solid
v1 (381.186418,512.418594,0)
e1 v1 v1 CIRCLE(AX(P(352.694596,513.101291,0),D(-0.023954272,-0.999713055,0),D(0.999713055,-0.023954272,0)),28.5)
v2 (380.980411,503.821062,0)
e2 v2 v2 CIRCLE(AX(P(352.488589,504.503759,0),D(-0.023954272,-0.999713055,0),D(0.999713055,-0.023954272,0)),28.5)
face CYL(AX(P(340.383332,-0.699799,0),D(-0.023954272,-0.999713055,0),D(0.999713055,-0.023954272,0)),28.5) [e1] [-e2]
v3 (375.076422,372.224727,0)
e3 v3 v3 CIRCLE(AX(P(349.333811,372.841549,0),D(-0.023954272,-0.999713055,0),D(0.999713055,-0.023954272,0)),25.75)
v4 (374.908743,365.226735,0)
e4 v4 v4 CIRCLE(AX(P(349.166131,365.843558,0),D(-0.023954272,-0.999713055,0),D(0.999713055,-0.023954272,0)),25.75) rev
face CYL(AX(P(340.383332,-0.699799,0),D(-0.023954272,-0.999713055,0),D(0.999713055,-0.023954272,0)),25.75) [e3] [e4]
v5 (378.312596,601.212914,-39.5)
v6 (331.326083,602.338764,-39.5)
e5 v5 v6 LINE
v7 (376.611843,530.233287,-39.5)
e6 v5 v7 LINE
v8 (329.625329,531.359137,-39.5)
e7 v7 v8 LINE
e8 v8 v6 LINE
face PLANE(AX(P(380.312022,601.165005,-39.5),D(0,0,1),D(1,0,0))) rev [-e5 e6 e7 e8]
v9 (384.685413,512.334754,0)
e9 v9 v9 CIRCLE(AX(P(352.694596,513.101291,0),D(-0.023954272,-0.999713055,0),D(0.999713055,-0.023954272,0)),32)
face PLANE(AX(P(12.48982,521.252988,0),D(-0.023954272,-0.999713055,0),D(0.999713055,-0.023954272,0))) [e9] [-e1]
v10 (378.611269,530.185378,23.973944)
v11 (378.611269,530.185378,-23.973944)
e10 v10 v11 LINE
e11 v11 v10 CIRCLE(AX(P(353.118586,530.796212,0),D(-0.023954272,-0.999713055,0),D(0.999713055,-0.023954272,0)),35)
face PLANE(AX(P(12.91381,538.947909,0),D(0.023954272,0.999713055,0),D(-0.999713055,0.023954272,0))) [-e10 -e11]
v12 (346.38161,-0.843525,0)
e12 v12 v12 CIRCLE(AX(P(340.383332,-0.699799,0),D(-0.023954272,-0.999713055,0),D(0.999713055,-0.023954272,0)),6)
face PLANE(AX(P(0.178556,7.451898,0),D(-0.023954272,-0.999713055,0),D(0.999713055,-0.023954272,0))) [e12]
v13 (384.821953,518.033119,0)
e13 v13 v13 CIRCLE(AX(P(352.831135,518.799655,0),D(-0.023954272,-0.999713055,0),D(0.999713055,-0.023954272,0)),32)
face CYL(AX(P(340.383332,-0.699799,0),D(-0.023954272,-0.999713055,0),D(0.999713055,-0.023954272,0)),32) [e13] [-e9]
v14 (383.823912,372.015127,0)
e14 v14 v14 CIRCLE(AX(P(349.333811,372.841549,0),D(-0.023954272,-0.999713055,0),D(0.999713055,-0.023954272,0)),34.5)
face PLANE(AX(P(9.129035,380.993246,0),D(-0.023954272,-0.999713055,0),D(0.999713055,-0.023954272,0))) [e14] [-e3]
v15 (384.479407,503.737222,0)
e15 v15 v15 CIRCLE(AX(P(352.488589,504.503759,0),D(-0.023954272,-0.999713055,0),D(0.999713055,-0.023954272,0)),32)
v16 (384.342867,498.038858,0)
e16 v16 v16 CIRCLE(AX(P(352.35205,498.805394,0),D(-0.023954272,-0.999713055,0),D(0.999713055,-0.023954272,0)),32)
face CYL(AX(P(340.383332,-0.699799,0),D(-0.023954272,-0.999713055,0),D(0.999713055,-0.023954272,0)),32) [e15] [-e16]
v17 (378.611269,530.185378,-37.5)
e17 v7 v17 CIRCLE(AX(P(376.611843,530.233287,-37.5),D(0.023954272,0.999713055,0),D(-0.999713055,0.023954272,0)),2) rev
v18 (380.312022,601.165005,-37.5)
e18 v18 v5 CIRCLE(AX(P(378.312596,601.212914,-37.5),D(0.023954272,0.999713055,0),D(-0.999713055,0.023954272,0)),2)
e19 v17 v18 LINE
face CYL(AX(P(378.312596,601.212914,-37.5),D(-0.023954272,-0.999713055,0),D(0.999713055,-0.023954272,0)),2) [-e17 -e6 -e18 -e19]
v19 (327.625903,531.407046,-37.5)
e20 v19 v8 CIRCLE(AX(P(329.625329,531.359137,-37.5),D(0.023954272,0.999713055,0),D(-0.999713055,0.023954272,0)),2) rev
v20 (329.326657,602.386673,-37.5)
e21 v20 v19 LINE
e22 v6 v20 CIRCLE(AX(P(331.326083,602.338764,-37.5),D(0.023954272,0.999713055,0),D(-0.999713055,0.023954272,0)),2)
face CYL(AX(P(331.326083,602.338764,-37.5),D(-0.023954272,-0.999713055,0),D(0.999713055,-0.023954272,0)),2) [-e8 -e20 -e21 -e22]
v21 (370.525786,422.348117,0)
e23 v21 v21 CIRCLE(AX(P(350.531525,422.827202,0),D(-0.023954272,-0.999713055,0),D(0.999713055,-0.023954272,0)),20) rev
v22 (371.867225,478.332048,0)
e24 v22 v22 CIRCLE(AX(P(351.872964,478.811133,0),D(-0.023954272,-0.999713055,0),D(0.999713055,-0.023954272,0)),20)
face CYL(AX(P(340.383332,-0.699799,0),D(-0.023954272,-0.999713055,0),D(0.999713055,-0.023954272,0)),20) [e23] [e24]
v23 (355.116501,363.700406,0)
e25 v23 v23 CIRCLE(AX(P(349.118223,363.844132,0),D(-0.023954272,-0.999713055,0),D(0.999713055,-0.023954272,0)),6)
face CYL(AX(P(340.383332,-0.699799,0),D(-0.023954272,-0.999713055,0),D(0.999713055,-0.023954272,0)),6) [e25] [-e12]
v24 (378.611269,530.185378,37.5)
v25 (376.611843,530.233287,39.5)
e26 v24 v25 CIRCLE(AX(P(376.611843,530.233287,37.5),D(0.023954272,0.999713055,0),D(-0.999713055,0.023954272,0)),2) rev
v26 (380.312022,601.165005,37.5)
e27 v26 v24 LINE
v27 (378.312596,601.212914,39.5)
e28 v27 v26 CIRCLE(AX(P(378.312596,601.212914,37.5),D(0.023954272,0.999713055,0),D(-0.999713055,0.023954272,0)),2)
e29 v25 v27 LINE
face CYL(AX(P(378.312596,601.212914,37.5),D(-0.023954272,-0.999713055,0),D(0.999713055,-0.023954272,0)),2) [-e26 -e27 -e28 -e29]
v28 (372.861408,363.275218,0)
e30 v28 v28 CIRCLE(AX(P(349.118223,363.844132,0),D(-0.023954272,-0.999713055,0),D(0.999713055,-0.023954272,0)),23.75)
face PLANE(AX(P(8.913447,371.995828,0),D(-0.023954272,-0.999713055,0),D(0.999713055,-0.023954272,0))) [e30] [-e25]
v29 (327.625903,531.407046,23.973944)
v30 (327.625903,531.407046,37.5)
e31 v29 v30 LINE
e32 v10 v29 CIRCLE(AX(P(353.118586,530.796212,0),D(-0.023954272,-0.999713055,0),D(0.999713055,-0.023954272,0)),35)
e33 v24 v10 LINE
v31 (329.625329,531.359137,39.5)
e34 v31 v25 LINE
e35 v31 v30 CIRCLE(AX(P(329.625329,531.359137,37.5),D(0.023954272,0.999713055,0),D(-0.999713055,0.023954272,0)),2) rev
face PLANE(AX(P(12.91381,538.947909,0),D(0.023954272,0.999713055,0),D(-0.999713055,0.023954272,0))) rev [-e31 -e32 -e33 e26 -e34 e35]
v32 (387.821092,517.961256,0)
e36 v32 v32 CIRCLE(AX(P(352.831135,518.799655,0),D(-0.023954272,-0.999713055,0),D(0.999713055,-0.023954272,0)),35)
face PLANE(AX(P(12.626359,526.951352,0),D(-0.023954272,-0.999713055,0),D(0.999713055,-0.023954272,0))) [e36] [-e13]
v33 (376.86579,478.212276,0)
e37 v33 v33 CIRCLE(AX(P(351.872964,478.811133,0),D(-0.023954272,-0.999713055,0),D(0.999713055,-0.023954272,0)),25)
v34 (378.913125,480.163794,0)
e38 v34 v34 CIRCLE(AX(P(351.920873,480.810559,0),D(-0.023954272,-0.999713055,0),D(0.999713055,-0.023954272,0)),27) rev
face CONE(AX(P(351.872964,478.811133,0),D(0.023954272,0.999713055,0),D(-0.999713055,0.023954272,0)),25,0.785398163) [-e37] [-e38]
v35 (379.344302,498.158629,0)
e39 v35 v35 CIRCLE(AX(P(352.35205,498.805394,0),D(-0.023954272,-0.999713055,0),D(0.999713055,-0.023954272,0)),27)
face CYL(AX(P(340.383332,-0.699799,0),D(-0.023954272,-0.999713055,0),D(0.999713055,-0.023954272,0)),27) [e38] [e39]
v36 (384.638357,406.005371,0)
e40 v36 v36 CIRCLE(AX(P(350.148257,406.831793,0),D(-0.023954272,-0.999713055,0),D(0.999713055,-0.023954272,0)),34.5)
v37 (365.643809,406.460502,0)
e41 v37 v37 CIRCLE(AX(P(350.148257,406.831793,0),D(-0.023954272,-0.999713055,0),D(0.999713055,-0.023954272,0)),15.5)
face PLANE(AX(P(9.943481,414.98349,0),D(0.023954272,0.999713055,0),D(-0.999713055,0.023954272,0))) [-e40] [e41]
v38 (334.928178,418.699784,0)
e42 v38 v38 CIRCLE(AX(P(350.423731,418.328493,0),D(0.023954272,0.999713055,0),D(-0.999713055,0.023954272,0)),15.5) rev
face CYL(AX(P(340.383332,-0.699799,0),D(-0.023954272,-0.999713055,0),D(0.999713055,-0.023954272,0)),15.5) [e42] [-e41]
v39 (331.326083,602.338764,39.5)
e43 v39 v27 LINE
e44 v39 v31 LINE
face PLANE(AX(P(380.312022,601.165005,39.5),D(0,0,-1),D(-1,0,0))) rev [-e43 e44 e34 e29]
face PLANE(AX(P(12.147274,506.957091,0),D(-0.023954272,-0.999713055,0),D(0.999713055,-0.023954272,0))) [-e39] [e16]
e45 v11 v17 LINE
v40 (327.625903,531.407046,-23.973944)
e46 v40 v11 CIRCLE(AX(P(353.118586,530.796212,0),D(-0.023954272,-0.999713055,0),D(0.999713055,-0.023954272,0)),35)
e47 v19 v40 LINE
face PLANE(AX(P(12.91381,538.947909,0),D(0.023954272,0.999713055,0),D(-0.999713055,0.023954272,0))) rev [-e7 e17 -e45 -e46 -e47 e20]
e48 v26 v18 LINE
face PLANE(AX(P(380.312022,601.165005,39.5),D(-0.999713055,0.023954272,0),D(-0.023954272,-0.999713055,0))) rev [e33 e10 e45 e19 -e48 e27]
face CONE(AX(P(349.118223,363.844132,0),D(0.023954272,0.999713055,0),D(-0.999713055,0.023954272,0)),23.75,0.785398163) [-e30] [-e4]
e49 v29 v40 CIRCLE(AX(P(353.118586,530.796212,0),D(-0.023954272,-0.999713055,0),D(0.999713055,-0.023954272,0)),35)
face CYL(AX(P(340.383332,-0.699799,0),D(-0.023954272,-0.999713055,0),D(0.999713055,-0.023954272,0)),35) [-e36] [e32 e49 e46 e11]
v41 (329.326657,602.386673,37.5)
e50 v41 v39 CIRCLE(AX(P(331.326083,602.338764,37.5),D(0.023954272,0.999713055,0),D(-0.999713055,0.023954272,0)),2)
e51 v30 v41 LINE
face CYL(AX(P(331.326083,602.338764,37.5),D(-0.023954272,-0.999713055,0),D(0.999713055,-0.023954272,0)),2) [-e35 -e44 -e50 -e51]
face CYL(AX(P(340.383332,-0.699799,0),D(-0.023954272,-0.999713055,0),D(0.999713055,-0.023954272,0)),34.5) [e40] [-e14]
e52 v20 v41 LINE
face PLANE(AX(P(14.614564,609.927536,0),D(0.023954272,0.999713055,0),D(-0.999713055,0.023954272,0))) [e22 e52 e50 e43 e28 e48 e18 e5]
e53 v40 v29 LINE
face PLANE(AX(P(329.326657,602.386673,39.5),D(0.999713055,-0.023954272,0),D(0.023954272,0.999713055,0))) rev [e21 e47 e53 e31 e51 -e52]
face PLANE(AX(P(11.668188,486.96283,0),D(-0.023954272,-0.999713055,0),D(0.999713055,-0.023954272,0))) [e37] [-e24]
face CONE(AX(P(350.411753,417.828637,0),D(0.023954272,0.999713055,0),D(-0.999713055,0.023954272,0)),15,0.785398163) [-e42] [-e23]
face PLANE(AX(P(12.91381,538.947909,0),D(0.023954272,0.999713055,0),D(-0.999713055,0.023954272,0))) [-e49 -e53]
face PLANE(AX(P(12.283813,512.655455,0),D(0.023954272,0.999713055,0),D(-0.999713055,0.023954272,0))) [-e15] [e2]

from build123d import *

# Parameters (mm, degrees)
CHAMFER1_SIZE       = 5
CHAMFER2_SIZE       = 2
SKETCH2_W           = 51
SKETCH2_H           = 79
BOSS_EXTRUDE1_DEPTH = 71
FILLET1_R           = 2


with BuildPart() as part:
    # Sketch1 → Revolve2 (revolve)
    with BuildSketch(Plane.XY):
        Polygon((387.82109188, 517.961255794), (388.108543141, 529.957812458), (353.118586206, 530.796211969), (340.38333201, -0.699799139), (346.381610341, -0.843524769), (355.116501156, 363.700406109), (374.860833998, 363.227309242), (375.076422443, 372.22472674), (383.823911677, 372.015126862), (384.638356916, 406.005370741), (365.643808866, 406.460501904), (365.907305855, 417.457345512), (370.406014604, 417.349551289), (371.867225181, 478.33204766), (378.865216568, 478.164367758), (379.344302003, 498.158628863), (384.342867279, 498.038857504), (384.479406628, 503.737221919), (380.980410934, 503.82106187), (381.186417671, 512.418594146), (384.685413365, 512.334754195), (384.821952714, 518.03311861), align=None)
    revolve(axis=Axis((340.38333201, -0.699799139, 0), (0.023954271746676543, 0.9997130552639024, 0)))

    # Chamfer1
    # the kernel refuses this chamfer: 5 mm, written as the material it takes off along each edge
    with BuildSketch(Plane(origin=(350.411753499, 417.828636724, 0), x_dir=(0.9997130552639024, -0.02395427174667721, 0), z_dir=(0, 0, 1))) as chamfer1_piece_1_section:
        Polygon((20 - CHAMFER1_SIZE, 0), (20, CHAMFER1_SIZE), (20, 0), align=None)
    chamfer1_piece_1 = revolve(axis=Axis((350.411753499, 417.828636724, 0), (0.023954271746676543, 0.9997130552639024, 0)), mode=Mode.PRIVATE)
    chamfer1_piece_1 = chamfer1_piece_1 - Plane(origin=(350.477356387, 420.56652265, 0), x_dir=(0.9997130552639024, -0.023954271746676543, 0), z_dir=(0.023954271746676543, 0.9997130552639024, 0)) * Cylinder(15.5, 80, mode=Mode.PRIVATE)
    add(chamfer1_piece_1, mode=Mode.SUBTRACT)

    # Chamfer2
    chamfer2_edges = [part.edges().sort_by_distance(p)[0] for p in [
        (324.880711583, 479.457898432, 0),
        (323.375611652, 364.460954237, 0),
    ]]
    chamfer(chamfer2_edges, length=CHAMFER2_SIZE)

    # Sketch2 → Boss-Extrude1 (add)
    with BuildSketch(Plane(origin=(12.913810212, 538.947908709, 0), x_dir=(0.9997130552639024, -0.023954271746676654, 0), z_dir=(0.023954271746676657, 0.9997130552639025, 0))):
        with Locations((340.302423983, 0)):
            Rectangle(SKETCH2_W, SKETCH2_H)
    extrude(amount=BOSS_EXTRUDE1_DEPTH)

    # Fillet1
    fillet1_edges = [part.edges().sort_by_distance(p)[0] for p in [
        (328.476279944, 566.89685936, -39.5),
        (328.476279944, 566.89685936, 39.5),
        (379.461645763, 565.675191501, 39.5),
        (379.461645763, 565.675191501, -39.5),
    ]]
    fillet(fillet1_edges, radius=FILLET1_R)


solid = part.part
